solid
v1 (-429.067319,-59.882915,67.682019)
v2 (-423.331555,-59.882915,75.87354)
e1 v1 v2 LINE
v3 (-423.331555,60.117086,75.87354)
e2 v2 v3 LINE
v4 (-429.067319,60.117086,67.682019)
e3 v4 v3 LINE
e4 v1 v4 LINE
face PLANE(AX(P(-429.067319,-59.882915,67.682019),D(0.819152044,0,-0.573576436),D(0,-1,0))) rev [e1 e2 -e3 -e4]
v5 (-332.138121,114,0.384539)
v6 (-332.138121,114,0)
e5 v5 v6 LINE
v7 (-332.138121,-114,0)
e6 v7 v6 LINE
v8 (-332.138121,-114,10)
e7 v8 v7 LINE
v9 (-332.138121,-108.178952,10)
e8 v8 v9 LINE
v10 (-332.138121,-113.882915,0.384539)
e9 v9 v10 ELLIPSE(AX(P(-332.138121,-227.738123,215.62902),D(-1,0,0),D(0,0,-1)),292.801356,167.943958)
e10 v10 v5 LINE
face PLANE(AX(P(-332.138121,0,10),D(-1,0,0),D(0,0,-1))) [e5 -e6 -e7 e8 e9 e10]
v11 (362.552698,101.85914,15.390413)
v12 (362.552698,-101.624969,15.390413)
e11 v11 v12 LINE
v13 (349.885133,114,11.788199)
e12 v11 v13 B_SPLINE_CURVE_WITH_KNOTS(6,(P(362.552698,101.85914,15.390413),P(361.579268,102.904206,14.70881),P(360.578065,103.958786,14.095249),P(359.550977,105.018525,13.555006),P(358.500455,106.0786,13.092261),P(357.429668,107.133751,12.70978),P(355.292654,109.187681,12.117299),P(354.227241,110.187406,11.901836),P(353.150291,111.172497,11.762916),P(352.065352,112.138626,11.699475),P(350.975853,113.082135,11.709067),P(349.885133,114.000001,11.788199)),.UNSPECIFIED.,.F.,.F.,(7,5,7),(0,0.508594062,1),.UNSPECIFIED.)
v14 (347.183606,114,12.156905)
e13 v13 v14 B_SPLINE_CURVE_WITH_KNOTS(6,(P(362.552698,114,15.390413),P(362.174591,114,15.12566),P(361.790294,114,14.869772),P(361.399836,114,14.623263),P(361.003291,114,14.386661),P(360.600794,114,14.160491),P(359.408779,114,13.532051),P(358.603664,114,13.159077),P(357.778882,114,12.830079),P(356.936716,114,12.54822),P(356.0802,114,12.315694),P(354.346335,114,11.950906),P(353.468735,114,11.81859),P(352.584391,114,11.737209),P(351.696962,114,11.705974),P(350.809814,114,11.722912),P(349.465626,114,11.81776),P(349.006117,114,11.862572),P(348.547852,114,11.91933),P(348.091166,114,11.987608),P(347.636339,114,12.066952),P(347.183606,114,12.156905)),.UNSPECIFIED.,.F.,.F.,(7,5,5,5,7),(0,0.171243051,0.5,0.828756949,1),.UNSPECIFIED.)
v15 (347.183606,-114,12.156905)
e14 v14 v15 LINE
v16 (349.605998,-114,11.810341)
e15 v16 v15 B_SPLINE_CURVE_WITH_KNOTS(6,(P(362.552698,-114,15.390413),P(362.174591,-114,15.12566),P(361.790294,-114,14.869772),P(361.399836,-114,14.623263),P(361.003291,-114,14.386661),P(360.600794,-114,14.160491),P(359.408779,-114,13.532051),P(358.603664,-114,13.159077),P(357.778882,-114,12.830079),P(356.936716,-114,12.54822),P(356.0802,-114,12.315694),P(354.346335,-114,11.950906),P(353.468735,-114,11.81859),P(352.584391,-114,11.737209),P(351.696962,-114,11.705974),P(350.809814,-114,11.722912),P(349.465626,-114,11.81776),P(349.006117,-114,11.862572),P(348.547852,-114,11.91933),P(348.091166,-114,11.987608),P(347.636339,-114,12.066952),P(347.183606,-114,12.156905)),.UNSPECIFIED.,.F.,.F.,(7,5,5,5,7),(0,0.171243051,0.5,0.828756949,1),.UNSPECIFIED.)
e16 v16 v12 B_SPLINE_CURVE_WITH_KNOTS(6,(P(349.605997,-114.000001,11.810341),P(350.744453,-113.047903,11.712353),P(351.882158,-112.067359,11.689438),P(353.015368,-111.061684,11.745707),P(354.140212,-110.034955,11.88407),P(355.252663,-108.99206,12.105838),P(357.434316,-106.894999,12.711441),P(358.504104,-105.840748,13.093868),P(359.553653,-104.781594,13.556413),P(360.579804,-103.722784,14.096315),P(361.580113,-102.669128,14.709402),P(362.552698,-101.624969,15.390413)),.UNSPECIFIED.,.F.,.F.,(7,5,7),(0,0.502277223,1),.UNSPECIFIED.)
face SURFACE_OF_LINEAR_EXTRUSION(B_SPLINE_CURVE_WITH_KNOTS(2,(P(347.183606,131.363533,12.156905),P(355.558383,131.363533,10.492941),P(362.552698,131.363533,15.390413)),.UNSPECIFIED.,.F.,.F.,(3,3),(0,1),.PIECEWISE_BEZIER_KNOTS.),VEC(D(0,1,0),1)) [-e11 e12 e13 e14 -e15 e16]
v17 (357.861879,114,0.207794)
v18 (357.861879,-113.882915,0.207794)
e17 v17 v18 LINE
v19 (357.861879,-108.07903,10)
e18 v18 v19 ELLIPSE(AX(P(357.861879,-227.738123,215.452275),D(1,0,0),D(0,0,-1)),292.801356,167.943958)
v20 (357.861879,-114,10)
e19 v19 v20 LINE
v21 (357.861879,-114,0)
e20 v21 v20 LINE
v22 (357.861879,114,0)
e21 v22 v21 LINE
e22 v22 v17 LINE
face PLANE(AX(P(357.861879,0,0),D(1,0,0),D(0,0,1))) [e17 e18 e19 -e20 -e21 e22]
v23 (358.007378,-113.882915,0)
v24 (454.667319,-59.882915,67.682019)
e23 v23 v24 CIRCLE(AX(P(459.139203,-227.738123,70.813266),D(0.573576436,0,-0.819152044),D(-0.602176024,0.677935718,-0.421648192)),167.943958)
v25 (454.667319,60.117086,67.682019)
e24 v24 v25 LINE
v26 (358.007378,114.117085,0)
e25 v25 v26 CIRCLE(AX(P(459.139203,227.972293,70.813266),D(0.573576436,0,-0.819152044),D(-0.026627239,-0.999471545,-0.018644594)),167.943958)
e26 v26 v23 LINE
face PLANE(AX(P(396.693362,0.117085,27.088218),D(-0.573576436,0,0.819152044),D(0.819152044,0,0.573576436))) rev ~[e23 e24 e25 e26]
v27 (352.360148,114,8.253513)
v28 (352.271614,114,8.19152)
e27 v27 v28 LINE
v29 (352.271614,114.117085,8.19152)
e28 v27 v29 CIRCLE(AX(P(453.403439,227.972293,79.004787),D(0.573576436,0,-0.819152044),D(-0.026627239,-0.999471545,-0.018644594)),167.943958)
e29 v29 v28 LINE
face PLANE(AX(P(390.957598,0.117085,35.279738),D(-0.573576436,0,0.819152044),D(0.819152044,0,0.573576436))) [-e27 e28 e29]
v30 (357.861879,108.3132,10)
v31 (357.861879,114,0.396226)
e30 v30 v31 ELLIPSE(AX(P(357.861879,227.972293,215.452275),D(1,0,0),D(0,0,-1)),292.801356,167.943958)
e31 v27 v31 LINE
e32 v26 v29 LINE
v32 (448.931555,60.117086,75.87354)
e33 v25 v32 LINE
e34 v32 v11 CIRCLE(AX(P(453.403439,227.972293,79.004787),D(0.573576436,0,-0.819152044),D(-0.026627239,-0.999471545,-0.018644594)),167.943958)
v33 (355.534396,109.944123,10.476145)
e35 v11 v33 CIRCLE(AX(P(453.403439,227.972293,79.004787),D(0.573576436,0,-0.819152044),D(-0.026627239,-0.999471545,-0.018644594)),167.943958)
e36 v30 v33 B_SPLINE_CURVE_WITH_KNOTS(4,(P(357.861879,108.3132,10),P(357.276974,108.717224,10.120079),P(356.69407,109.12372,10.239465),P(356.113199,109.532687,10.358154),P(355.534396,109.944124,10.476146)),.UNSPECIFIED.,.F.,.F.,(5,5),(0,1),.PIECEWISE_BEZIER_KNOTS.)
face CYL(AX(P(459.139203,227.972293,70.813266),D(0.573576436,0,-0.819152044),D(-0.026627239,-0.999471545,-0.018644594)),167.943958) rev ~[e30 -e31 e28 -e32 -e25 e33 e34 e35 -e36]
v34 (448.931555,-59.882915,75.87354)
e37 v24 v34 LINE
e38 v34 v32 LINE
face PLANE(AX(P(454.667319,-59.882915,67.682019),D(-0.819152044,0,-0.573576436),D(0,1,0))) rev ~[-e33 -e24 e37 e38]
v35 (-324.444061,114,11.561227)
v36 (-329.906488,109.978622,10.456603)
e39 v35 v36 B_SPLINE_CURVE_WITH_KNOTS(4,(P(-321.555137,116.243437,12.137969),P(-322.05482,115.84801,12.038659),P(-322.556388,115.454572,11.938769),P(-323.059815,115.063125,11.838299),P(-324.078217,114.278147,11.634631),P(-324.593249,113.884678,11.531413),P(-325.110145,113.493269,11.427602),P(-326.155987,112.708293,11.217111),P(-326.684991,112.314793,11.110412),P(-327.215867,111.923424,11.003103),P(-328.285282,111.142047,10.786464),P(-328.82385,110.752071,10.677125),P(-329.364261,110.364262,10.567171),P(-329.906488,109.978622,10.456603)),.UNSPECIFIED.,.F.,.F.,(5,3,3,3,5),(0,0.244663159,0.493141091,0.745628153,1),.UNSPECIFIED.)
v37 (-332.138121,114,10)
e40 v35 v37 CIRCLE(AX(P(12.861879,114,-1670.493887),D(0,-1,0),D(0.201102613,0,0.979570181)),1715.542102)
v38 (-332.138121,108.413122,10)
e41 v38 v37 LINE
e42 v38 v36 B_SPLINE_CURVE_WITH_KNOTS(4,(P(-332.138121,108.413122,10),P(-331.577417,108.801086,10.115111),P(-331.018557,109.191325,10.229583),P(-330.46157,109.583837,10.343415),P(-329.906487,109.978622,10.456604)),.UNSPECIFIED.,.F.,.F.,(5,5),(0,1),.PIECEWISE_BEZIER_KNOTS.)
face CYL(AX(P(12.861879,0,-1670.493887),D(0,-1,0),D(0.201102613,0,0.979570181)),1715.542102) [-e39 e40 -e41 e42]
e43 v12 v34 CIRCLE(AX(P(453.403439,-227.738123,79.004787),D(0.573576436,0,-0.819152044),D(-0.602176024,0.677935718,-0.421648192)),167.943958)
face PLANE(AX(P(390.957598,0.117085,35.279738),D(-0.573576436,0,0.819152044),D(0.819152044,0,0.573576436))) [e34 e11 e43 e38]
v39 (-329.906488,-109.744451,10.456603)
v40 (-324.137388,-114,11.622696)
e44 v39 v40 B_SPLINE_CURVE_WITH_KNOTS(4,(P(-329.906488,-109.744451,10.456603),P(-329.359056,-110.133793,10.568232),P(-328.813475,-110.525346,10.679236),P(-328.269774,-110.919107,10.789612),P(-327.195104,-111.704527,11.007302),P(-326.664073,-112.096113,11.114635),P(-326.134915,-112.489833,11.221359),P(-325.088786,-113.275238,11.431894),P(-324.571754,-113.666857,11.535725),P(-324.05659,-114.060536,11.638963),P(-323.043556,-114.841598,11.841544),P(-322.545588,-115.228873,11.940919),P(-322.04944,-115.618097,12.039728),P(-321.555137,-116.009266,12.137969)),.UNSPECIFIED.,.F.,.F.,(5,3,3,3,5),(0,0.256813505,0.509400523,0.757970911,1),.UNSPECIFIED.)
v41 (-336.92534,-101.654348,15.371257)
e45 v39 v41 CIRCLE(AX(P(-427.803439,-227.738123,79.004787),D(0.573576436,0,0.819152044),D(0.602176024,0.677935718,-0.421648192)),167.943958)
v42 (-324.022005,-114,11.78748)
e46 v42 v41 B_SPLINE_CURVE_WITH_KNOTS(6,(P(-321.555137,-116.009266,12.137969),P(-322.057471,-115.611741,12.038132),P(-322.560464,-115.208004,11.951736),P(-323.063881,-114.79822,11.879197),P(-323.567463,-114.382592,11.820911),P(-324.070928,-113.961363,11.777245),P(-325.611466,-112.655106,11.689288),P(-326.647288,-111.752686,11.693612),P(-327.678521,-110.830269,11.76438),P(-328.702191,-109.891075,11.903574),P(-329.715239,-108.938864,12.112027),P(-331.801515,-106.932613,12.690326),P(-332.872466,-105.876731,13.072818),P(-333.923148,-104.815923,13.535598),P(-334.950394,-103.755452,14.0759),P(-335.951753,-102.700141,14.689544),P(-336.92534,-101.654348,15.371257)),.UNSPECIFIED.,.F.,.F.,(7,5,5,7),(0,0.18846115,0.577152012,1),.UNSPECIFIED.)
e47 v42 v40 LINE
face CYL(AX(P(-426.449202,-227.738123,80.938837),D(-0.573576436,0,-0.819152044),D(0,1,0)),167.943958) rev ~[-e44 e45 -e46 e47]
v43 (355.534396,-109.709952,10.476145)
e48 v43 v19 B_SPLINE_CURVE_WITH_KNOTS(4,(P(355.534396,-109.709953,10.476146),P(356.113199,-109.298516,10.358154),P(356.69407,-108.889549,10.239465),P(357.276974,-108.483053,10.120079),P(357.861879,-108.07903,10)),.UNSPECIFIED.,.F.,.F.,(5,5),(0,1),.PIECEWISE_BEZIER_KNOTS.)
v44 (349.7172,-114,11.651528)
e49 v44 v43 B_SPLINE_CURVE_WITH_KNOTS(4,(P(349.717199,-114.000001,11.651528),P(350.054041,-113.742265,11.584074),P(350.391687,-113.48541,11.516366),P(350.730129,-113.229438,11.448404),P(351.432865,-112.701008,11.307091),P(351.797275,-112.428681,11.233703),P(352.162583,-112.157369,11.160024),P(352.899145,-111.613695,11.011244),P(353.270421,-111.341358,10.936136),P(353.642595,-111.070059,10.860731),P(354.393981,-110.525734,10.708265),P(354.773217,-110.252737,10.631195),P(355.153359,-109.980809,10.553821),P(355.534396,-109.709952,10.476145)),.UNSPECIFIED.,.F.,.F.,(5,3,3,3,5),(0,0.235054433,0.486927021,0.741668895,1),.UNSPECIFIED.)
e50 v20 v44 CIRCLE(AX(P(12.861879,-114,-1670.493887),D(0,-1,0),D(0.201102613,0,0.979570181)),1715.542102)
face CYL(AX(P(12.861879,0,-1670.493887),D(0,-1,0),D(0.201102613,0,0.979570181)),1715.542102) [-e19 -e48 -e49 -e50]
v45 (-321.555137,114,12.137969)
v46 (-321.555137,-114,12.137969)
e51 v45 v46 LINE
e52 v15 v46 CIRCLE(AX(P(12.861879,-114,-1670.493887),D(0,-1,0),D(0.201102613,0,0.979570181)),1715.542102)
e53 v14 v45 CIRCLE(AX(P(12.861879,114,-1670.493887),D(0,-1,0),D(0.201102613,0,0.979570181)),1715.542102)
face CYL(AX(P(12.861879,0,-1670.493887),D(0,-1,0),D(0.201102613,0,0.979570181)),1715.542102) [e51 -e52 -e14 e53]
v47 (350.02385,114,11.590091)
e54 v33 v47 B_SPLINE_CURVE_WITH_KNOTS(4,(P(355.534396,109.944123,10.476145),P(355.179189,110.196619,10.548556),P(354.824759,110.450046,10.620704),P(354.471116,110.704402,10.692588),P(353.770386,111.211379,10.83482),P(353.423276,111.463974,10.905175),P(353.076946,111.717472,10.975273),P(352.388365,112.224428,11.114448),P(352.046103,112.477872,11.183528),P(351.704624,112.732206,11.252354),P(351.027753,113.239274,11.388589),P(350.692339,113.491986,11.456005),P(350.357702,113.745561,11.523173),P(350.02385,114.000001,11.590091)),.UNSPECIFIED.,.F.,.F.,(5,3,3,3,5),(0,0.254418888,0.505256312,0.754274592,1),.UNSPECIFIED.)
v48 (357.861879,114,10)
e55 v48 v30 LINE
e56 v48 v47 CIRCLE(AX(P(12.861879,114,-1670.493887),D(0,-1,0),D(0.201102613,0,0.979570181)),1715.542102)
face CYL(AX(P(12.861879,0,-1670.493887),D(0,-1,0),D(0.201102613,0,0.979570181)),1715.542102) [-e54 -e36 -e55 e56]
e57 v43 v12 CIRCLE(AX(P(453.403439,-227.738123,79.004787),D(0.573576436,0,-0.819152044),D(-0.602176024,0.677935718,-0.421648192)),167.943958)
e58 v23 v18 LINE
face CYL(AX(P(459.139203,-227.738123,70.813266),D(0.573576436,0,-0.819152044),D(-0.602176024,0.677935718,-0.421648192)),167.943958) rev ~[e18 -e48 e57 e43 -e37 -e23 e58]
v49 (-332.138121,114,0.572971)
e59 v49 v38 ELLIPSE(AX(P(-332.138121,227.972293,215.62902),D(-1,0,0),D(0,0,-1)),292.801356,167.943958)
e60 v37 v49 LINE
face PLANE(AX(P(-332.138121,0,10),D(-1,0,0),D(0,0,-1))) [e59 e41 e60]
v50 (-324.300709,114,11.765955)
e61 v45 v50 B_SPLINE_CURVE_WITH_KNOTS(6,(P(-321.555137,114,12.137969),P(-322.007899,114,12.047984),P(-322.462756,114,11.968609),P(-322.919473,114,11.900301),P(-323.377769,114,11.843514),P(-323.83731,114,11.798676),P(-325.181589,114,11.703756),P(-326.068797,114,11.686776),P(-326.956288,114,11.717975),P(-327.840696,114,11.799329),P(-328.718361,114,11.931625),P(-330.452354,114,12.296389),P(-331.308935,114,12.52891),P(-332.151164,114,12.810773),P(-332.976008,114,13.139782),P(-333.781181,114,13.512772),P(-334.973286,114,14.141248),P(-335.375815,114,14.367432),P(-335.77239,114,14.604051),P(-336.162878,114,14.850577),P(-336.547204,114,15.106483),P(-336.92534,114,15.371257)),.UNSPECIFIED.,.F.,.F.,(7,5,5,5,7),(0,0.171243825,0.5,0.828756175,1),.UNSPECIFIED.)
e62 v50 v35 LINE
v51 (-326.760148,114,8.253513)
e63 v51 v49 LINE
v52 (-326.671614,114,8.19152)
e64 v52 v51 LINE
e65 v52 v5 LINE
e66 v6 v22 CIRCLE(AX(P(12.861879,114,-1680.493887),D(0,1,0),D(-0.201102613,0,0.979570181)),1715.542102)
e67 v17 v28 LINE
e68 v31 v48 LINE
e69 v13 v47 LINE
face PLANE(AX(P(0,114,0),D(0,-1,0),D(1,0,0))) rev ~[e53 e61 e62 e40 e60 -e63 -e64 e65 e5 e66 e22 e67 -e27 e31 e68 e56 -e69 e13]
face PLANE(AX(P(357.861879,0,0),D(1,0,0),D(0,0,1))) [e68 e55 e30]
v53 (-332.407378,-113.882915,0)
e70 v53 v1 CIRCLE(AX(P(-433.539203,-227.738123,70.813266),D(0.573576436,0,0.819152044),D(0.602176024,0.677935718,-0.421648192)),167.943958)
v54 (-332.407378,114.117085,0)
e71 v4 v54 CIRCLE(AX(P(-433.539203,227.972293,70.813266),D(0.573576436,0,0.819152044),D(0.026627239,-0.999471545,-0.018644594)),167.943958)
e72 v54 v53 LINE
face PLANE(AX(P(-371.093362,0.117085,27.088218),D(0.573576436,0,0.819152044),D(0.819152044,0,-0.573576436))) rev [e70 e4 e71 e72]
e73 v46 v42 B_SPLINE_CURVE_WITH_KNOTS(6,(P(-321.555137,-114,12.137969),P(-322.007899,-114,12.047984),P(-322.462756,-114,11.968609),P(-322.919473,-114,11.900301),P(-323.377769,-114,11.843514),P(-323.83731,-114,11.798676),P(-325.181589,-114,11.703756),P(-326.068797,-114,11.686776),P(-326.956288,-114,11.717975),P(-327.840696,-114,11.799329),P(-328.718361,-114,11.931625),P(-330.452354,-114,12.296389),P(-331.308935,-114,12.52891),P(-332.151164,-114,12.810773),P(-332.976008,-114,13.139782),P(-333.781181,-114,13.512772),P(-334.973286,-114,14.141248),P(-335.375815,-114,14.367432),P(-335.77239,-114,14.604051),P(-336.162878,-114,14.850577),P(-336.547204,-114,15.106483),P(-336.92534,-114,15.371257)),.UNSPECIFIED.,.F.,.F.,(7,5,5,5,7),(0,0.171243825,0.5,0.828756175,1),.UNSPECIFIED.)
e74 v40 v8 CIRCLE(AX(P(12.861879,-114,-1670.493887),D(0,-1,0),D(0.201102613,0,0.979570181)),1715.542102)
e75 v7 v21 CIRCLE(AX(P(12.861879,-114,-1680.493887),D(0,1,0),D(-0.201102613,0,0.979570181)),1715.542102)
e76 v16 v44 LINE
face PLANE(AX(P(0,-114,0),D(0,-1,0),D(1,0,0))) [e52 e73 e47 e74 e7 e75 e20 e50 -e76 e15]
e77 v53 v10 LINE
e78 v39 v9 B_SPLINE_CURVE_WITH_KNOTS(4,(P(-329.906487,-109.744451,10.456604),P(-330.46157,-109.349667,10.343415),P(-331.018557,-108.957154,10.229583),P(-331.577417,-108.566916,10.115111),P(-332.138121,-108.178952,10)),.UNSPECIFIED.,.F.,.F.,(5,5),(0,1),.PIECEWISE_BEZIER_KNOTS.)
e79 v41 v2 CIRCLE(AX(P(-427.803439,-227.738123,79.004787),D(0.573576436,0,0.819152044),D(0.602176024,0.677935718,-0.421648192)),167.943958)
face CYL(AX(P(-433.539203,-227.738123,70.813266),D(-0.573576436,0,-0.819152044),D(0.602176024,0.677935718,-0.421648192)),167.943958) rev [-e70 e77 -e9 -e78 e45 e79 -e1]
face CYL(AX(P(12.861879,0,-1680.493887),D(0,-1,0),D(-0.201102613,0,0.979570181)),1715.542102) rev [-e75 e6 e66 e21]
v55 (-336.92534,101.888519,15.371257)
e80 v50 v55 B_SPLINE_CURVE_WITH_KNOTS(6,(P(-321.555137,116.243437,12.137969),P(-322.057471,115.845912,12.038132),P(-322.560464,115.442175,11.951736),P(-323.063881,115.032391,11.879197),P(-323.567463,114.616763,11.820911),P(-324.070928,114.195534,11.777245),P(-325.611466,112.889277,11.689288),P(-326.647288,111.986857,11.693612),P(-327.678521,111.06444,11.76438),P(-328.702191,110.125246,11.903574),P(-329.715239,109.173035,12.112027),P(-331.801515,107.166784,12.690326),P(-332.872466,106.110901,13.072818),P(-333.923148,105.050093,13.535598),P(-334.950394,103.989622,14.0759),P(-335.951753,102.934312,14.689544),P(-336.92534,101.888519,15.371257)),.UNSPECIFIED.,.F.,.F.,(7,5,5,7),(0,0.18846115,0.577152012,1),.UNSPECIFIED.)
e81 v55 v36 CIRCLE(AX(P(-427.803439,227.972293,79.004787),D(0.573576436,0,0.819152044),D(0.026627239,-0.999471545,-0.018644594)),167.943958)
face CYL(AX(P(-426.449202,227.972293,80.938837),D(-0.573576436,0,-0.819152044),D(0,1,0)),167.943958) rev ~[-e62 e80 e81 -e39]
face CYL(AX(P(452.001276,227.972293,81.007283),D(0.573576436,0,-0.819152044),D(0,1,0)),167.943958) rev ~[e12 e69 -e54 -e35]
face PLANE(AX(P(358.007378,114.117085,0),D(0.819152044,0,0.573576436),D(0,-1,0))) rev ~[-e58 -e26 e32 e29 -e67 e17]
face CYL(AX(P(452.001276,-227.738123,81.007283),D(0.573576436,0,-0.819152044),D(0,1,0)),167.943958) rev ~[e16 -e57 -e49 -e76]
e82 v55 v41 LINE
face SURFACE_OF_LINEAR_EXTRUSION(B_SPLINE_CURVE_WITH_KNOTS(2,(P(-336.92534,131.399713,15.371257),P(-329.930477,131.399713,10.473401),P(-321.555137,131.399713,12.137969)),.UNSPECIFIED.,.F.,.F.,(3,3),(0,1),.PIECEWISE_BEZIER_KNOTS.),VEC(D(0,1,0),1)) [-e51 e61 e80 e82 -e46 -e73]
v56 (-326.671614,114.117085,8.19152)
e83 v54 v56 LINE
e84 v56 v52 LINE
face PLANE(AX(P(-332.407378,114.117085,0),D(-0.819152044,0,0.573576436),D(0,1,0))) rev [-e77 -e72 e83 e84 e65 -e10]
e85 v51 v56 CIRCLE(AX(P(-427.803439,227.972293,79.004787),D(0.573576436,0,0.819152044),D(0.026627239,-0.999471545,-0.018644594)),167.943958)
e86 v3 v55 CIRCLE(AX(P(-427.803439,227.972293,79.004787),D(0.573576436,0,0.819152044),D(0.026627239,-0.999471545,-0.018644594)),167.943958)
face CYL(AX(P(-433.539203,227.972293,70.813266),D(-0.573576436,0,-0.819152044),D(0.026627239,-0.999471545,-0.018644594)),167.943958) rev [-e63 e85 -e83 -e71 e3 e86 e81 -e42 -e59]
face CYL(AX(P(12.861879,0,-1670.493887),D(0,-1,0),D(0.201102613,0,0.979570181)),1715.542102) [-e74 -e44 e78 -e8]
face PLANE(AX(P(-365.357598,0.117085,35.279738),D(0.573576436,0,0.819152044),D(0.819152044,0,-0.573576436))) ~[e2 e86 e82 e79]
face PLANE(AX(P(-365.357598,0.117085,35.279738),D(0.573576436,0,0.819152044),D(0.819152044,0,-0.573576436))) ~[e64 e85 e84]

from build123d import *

# Parameters (mm, degrees)
F1_DEPTH      = 114
F3_DEPTH      = 10
F4_ANGLE      = 35
F9_T4_DEPTH   = 262.5652555071
F9_S5_R       = 167.9439583926
F9_T6_DEPTH   = 133
F9_S7_R       = 167.9439583926
F9_T8_DEPTH   = 133
F10_T4_DEPTH  = 262.4928960507
F10_S7_R      = 167.9439583926
F10_T8_DEPTH  = 133
F10_S9_R      = 167.9439583926
F10_T10_DEPTH = 133


# Not quite as in the source:
# - a fillet or chamfer that OpenCascade refuses, or shapes differently, is made with other operations: its cross-section is extruded or revolved along the edge and cut away or added


with BuildPart() as f1:
    # F0 (on Front) → F1 (new body, symmetric)
    with BuildSketch(Plane.XZ):
        with BuildLine():
            ThreePointArc((-332.1381211281, 0), (12.8618788719, 35.0482151539), (357.8618788719, 0))
            Line((357.8618788719, 0), (357.8618788719, 10))
            ThreePointArc((357.8618788719, 10), (12.8618788719, 45.0482151539), (-332.1381211281, 10))
            Line((-332.1381211281, 10), (-332.1381211281, 0))
        make_face()
    extrude(amount=F1_DEPTH, both=True)


with BuildPart() as f3:
    # F2 (on Top) → F3 (new body)
    with BuildSketch(Plane.XY):
        with BuildLine():
            ThreePointArc((123.1073781215, 58.2170858979), (58.6810369853, 73.3595252621), (5.1073781215, 112.2170853764))
            Line((5.1073781215, 112.2170853764), (5.1073781215, -115.7829146236))
            ThreePointArc((5.1073781215, -115.7829146236), (58.6810369853, -76.9253545093), (123.1073781215, -61.7829151452))
            Line((123.1073781215, -61.7829151452), (123.1073781215, 58.2170858979))
        make_face()
    extrude(amount=F3_DEPTH)


with BuildPart() as f3_1:
    # F4: moved
    add(f3.part.rotate(Axis((5.1073781215, -1.7829146236, 0), (0, -1, 0)), F4_ANGLE))


with BuildPart() as f3_2:
    # F5: moved
    add(f3_1.part.moved(Location((352.9, 1.9, 0))))


with BuildPart() as f6_1:
    # F6: instance of F3
    add(f3_2.part.mirror(Plane.YZ))


with BuildPart() as f6_1_1:
    # F7: moved
    add(f6_1.part.moved(Location((25.6, 0, 0))))

    # F8: union F1, F3
    add(f1.part)
    add(f3_2.part)

    # F9: fillet of radius 20 on 1 edges, made by hand


with BuildPart() as f9_tool2:
    # F9_s3 → F9_t4 (new body)
    with BuildSketch(Plane.XZ.offset(-131.39971313)):
        with BuildLine():
            add(Edge.make_bspline(
                [(-336.9253398984, 15.3712567812), (-329.9304765428, 10.4734007308), (-321.5551366342, 12.1379693445)],
                knots=[0, 0, 0, 1, 1, 1], degree=2, weights=[1, 1, 1]))
            ThreePointArc((-321.5551366342, 12.1379693445), (-325.7318557218, 11.3024702142), (-329.9064875028, 10.4566034242))
            Line((-329.9064875028, 10.4566034242), (-336.9253398984, 15.3712567812))
        make_face()
    extrude(amount=F9_T4_DEPTH)

    # F9_s5 → F9_t6 (cut, symmetric)
    with BuildSketch(Plane(origin=(-102.2686786014, 0, -146.0548094967), x_dir=(0, 1, 0), z_dir=(-0.5735764364, 0, -0.8191520443))):
        with Locations((-227.7381227134, -395.7513456072)):
            Circle(F9_S5_R)
    extrude(amount=F9_T6_DEPTH, both=True, mode=Mode.SUBTRACT)

    # F9_s7 → F9_t8 (cut, symmetric)
    with BuildSketch(Plane(origin=(-102.2686786014, 0, -146.0548094967), x_dir=(0, 1, 0), z_dir=(-0.5735764364, 0, -0.8191520443))):
        with Locations((227.9722934661, -395.7513456072)):
            Circle(F9_S7_R)
    extrude(amount=F9_T8_DEPTH, both=True, mode=Mode.SUBTRACT)

    split(bisect_by=Plane.XZ.offset(114), keep=Keep.BOTTOM)

    split(bisect_by=Plane.XZ.offset(-114), keep=Keep.TOP)


with BuildPart() as f6_1_2:
    add(f6_1_1.part)

    # F9_t1: union F9_tool2
    add(f9_tool2.part)

    # F10: fillet of radius 20 on 1 edges, made by hand


with BuildPart() as f10_tool2:
    # F10_s3 → F10_t4 (new body)
    with BuildSketch(Plane.XZ.offset(-131.3635334017)):
        with BuildLine():
            add(Edge.make_bspline(
                [(347.1836055083, 12.1569048592), (355.5583829749, 10.492941025), (362.5526978832, 15.3904130484)],
                knots=[0, 0, 0, 1, 1, 1], degree=2, weights=[1, 1, 1]))
            Line((362.5526978832, 15.3904130484), (355.5343963998, 10.4761454443))
            ThreePointArc((355.5343963998, 10.4761454443), (351.360044149, 11.3217082271), (347.1836055083, 12.1569048592))
        make_face()
    extrude(amount=F10_T4_DEPTH)

    split(bisect_by=Plane.XZ.offset(114), keep=Keep.BOTTOM)

    split(bisect_by=Plane.XZ.offset(-114), keep=Keep.TOP)

    # F10_s7 → F10_t8 (cut, symmetric)
    with BuildSketch(Plane(origin=(110.6428945721, 0, -158.0144293433), x_dir=(0, 1, 0), z_dir=(0.5735764364, 0, -0.8191520443))):
        with Locations((227.9722934661, 416.721637941)):
            Circle(F10_S7_R)
    extrude(amount=F10_T8_DEPTH, both=True, mode=Mode.SUBTRACT)

    # F10_s9 → F10_t10 (cut, symmetric)
    with BuildSketch(Plane(origin=(110.6428945721, 0, -158.0144293433), x_dir=(0, 1, 0), z_dir=(0.5735764364, 0, -0.8191520443))):
        with Locations((-227.7381227134, 416.721637941)):
            Circle(F10_S9_R)
    extrude(amount=F10_T10_DEPTH, both=True, mode=Mode.SUBTRACT)


with BuildPart() as f6_1_3:
    add(f6_1_2.part)

    # F10_t1: union F10_tool2
    add(f10_tool2.part)


solid = f6_1_3.part
